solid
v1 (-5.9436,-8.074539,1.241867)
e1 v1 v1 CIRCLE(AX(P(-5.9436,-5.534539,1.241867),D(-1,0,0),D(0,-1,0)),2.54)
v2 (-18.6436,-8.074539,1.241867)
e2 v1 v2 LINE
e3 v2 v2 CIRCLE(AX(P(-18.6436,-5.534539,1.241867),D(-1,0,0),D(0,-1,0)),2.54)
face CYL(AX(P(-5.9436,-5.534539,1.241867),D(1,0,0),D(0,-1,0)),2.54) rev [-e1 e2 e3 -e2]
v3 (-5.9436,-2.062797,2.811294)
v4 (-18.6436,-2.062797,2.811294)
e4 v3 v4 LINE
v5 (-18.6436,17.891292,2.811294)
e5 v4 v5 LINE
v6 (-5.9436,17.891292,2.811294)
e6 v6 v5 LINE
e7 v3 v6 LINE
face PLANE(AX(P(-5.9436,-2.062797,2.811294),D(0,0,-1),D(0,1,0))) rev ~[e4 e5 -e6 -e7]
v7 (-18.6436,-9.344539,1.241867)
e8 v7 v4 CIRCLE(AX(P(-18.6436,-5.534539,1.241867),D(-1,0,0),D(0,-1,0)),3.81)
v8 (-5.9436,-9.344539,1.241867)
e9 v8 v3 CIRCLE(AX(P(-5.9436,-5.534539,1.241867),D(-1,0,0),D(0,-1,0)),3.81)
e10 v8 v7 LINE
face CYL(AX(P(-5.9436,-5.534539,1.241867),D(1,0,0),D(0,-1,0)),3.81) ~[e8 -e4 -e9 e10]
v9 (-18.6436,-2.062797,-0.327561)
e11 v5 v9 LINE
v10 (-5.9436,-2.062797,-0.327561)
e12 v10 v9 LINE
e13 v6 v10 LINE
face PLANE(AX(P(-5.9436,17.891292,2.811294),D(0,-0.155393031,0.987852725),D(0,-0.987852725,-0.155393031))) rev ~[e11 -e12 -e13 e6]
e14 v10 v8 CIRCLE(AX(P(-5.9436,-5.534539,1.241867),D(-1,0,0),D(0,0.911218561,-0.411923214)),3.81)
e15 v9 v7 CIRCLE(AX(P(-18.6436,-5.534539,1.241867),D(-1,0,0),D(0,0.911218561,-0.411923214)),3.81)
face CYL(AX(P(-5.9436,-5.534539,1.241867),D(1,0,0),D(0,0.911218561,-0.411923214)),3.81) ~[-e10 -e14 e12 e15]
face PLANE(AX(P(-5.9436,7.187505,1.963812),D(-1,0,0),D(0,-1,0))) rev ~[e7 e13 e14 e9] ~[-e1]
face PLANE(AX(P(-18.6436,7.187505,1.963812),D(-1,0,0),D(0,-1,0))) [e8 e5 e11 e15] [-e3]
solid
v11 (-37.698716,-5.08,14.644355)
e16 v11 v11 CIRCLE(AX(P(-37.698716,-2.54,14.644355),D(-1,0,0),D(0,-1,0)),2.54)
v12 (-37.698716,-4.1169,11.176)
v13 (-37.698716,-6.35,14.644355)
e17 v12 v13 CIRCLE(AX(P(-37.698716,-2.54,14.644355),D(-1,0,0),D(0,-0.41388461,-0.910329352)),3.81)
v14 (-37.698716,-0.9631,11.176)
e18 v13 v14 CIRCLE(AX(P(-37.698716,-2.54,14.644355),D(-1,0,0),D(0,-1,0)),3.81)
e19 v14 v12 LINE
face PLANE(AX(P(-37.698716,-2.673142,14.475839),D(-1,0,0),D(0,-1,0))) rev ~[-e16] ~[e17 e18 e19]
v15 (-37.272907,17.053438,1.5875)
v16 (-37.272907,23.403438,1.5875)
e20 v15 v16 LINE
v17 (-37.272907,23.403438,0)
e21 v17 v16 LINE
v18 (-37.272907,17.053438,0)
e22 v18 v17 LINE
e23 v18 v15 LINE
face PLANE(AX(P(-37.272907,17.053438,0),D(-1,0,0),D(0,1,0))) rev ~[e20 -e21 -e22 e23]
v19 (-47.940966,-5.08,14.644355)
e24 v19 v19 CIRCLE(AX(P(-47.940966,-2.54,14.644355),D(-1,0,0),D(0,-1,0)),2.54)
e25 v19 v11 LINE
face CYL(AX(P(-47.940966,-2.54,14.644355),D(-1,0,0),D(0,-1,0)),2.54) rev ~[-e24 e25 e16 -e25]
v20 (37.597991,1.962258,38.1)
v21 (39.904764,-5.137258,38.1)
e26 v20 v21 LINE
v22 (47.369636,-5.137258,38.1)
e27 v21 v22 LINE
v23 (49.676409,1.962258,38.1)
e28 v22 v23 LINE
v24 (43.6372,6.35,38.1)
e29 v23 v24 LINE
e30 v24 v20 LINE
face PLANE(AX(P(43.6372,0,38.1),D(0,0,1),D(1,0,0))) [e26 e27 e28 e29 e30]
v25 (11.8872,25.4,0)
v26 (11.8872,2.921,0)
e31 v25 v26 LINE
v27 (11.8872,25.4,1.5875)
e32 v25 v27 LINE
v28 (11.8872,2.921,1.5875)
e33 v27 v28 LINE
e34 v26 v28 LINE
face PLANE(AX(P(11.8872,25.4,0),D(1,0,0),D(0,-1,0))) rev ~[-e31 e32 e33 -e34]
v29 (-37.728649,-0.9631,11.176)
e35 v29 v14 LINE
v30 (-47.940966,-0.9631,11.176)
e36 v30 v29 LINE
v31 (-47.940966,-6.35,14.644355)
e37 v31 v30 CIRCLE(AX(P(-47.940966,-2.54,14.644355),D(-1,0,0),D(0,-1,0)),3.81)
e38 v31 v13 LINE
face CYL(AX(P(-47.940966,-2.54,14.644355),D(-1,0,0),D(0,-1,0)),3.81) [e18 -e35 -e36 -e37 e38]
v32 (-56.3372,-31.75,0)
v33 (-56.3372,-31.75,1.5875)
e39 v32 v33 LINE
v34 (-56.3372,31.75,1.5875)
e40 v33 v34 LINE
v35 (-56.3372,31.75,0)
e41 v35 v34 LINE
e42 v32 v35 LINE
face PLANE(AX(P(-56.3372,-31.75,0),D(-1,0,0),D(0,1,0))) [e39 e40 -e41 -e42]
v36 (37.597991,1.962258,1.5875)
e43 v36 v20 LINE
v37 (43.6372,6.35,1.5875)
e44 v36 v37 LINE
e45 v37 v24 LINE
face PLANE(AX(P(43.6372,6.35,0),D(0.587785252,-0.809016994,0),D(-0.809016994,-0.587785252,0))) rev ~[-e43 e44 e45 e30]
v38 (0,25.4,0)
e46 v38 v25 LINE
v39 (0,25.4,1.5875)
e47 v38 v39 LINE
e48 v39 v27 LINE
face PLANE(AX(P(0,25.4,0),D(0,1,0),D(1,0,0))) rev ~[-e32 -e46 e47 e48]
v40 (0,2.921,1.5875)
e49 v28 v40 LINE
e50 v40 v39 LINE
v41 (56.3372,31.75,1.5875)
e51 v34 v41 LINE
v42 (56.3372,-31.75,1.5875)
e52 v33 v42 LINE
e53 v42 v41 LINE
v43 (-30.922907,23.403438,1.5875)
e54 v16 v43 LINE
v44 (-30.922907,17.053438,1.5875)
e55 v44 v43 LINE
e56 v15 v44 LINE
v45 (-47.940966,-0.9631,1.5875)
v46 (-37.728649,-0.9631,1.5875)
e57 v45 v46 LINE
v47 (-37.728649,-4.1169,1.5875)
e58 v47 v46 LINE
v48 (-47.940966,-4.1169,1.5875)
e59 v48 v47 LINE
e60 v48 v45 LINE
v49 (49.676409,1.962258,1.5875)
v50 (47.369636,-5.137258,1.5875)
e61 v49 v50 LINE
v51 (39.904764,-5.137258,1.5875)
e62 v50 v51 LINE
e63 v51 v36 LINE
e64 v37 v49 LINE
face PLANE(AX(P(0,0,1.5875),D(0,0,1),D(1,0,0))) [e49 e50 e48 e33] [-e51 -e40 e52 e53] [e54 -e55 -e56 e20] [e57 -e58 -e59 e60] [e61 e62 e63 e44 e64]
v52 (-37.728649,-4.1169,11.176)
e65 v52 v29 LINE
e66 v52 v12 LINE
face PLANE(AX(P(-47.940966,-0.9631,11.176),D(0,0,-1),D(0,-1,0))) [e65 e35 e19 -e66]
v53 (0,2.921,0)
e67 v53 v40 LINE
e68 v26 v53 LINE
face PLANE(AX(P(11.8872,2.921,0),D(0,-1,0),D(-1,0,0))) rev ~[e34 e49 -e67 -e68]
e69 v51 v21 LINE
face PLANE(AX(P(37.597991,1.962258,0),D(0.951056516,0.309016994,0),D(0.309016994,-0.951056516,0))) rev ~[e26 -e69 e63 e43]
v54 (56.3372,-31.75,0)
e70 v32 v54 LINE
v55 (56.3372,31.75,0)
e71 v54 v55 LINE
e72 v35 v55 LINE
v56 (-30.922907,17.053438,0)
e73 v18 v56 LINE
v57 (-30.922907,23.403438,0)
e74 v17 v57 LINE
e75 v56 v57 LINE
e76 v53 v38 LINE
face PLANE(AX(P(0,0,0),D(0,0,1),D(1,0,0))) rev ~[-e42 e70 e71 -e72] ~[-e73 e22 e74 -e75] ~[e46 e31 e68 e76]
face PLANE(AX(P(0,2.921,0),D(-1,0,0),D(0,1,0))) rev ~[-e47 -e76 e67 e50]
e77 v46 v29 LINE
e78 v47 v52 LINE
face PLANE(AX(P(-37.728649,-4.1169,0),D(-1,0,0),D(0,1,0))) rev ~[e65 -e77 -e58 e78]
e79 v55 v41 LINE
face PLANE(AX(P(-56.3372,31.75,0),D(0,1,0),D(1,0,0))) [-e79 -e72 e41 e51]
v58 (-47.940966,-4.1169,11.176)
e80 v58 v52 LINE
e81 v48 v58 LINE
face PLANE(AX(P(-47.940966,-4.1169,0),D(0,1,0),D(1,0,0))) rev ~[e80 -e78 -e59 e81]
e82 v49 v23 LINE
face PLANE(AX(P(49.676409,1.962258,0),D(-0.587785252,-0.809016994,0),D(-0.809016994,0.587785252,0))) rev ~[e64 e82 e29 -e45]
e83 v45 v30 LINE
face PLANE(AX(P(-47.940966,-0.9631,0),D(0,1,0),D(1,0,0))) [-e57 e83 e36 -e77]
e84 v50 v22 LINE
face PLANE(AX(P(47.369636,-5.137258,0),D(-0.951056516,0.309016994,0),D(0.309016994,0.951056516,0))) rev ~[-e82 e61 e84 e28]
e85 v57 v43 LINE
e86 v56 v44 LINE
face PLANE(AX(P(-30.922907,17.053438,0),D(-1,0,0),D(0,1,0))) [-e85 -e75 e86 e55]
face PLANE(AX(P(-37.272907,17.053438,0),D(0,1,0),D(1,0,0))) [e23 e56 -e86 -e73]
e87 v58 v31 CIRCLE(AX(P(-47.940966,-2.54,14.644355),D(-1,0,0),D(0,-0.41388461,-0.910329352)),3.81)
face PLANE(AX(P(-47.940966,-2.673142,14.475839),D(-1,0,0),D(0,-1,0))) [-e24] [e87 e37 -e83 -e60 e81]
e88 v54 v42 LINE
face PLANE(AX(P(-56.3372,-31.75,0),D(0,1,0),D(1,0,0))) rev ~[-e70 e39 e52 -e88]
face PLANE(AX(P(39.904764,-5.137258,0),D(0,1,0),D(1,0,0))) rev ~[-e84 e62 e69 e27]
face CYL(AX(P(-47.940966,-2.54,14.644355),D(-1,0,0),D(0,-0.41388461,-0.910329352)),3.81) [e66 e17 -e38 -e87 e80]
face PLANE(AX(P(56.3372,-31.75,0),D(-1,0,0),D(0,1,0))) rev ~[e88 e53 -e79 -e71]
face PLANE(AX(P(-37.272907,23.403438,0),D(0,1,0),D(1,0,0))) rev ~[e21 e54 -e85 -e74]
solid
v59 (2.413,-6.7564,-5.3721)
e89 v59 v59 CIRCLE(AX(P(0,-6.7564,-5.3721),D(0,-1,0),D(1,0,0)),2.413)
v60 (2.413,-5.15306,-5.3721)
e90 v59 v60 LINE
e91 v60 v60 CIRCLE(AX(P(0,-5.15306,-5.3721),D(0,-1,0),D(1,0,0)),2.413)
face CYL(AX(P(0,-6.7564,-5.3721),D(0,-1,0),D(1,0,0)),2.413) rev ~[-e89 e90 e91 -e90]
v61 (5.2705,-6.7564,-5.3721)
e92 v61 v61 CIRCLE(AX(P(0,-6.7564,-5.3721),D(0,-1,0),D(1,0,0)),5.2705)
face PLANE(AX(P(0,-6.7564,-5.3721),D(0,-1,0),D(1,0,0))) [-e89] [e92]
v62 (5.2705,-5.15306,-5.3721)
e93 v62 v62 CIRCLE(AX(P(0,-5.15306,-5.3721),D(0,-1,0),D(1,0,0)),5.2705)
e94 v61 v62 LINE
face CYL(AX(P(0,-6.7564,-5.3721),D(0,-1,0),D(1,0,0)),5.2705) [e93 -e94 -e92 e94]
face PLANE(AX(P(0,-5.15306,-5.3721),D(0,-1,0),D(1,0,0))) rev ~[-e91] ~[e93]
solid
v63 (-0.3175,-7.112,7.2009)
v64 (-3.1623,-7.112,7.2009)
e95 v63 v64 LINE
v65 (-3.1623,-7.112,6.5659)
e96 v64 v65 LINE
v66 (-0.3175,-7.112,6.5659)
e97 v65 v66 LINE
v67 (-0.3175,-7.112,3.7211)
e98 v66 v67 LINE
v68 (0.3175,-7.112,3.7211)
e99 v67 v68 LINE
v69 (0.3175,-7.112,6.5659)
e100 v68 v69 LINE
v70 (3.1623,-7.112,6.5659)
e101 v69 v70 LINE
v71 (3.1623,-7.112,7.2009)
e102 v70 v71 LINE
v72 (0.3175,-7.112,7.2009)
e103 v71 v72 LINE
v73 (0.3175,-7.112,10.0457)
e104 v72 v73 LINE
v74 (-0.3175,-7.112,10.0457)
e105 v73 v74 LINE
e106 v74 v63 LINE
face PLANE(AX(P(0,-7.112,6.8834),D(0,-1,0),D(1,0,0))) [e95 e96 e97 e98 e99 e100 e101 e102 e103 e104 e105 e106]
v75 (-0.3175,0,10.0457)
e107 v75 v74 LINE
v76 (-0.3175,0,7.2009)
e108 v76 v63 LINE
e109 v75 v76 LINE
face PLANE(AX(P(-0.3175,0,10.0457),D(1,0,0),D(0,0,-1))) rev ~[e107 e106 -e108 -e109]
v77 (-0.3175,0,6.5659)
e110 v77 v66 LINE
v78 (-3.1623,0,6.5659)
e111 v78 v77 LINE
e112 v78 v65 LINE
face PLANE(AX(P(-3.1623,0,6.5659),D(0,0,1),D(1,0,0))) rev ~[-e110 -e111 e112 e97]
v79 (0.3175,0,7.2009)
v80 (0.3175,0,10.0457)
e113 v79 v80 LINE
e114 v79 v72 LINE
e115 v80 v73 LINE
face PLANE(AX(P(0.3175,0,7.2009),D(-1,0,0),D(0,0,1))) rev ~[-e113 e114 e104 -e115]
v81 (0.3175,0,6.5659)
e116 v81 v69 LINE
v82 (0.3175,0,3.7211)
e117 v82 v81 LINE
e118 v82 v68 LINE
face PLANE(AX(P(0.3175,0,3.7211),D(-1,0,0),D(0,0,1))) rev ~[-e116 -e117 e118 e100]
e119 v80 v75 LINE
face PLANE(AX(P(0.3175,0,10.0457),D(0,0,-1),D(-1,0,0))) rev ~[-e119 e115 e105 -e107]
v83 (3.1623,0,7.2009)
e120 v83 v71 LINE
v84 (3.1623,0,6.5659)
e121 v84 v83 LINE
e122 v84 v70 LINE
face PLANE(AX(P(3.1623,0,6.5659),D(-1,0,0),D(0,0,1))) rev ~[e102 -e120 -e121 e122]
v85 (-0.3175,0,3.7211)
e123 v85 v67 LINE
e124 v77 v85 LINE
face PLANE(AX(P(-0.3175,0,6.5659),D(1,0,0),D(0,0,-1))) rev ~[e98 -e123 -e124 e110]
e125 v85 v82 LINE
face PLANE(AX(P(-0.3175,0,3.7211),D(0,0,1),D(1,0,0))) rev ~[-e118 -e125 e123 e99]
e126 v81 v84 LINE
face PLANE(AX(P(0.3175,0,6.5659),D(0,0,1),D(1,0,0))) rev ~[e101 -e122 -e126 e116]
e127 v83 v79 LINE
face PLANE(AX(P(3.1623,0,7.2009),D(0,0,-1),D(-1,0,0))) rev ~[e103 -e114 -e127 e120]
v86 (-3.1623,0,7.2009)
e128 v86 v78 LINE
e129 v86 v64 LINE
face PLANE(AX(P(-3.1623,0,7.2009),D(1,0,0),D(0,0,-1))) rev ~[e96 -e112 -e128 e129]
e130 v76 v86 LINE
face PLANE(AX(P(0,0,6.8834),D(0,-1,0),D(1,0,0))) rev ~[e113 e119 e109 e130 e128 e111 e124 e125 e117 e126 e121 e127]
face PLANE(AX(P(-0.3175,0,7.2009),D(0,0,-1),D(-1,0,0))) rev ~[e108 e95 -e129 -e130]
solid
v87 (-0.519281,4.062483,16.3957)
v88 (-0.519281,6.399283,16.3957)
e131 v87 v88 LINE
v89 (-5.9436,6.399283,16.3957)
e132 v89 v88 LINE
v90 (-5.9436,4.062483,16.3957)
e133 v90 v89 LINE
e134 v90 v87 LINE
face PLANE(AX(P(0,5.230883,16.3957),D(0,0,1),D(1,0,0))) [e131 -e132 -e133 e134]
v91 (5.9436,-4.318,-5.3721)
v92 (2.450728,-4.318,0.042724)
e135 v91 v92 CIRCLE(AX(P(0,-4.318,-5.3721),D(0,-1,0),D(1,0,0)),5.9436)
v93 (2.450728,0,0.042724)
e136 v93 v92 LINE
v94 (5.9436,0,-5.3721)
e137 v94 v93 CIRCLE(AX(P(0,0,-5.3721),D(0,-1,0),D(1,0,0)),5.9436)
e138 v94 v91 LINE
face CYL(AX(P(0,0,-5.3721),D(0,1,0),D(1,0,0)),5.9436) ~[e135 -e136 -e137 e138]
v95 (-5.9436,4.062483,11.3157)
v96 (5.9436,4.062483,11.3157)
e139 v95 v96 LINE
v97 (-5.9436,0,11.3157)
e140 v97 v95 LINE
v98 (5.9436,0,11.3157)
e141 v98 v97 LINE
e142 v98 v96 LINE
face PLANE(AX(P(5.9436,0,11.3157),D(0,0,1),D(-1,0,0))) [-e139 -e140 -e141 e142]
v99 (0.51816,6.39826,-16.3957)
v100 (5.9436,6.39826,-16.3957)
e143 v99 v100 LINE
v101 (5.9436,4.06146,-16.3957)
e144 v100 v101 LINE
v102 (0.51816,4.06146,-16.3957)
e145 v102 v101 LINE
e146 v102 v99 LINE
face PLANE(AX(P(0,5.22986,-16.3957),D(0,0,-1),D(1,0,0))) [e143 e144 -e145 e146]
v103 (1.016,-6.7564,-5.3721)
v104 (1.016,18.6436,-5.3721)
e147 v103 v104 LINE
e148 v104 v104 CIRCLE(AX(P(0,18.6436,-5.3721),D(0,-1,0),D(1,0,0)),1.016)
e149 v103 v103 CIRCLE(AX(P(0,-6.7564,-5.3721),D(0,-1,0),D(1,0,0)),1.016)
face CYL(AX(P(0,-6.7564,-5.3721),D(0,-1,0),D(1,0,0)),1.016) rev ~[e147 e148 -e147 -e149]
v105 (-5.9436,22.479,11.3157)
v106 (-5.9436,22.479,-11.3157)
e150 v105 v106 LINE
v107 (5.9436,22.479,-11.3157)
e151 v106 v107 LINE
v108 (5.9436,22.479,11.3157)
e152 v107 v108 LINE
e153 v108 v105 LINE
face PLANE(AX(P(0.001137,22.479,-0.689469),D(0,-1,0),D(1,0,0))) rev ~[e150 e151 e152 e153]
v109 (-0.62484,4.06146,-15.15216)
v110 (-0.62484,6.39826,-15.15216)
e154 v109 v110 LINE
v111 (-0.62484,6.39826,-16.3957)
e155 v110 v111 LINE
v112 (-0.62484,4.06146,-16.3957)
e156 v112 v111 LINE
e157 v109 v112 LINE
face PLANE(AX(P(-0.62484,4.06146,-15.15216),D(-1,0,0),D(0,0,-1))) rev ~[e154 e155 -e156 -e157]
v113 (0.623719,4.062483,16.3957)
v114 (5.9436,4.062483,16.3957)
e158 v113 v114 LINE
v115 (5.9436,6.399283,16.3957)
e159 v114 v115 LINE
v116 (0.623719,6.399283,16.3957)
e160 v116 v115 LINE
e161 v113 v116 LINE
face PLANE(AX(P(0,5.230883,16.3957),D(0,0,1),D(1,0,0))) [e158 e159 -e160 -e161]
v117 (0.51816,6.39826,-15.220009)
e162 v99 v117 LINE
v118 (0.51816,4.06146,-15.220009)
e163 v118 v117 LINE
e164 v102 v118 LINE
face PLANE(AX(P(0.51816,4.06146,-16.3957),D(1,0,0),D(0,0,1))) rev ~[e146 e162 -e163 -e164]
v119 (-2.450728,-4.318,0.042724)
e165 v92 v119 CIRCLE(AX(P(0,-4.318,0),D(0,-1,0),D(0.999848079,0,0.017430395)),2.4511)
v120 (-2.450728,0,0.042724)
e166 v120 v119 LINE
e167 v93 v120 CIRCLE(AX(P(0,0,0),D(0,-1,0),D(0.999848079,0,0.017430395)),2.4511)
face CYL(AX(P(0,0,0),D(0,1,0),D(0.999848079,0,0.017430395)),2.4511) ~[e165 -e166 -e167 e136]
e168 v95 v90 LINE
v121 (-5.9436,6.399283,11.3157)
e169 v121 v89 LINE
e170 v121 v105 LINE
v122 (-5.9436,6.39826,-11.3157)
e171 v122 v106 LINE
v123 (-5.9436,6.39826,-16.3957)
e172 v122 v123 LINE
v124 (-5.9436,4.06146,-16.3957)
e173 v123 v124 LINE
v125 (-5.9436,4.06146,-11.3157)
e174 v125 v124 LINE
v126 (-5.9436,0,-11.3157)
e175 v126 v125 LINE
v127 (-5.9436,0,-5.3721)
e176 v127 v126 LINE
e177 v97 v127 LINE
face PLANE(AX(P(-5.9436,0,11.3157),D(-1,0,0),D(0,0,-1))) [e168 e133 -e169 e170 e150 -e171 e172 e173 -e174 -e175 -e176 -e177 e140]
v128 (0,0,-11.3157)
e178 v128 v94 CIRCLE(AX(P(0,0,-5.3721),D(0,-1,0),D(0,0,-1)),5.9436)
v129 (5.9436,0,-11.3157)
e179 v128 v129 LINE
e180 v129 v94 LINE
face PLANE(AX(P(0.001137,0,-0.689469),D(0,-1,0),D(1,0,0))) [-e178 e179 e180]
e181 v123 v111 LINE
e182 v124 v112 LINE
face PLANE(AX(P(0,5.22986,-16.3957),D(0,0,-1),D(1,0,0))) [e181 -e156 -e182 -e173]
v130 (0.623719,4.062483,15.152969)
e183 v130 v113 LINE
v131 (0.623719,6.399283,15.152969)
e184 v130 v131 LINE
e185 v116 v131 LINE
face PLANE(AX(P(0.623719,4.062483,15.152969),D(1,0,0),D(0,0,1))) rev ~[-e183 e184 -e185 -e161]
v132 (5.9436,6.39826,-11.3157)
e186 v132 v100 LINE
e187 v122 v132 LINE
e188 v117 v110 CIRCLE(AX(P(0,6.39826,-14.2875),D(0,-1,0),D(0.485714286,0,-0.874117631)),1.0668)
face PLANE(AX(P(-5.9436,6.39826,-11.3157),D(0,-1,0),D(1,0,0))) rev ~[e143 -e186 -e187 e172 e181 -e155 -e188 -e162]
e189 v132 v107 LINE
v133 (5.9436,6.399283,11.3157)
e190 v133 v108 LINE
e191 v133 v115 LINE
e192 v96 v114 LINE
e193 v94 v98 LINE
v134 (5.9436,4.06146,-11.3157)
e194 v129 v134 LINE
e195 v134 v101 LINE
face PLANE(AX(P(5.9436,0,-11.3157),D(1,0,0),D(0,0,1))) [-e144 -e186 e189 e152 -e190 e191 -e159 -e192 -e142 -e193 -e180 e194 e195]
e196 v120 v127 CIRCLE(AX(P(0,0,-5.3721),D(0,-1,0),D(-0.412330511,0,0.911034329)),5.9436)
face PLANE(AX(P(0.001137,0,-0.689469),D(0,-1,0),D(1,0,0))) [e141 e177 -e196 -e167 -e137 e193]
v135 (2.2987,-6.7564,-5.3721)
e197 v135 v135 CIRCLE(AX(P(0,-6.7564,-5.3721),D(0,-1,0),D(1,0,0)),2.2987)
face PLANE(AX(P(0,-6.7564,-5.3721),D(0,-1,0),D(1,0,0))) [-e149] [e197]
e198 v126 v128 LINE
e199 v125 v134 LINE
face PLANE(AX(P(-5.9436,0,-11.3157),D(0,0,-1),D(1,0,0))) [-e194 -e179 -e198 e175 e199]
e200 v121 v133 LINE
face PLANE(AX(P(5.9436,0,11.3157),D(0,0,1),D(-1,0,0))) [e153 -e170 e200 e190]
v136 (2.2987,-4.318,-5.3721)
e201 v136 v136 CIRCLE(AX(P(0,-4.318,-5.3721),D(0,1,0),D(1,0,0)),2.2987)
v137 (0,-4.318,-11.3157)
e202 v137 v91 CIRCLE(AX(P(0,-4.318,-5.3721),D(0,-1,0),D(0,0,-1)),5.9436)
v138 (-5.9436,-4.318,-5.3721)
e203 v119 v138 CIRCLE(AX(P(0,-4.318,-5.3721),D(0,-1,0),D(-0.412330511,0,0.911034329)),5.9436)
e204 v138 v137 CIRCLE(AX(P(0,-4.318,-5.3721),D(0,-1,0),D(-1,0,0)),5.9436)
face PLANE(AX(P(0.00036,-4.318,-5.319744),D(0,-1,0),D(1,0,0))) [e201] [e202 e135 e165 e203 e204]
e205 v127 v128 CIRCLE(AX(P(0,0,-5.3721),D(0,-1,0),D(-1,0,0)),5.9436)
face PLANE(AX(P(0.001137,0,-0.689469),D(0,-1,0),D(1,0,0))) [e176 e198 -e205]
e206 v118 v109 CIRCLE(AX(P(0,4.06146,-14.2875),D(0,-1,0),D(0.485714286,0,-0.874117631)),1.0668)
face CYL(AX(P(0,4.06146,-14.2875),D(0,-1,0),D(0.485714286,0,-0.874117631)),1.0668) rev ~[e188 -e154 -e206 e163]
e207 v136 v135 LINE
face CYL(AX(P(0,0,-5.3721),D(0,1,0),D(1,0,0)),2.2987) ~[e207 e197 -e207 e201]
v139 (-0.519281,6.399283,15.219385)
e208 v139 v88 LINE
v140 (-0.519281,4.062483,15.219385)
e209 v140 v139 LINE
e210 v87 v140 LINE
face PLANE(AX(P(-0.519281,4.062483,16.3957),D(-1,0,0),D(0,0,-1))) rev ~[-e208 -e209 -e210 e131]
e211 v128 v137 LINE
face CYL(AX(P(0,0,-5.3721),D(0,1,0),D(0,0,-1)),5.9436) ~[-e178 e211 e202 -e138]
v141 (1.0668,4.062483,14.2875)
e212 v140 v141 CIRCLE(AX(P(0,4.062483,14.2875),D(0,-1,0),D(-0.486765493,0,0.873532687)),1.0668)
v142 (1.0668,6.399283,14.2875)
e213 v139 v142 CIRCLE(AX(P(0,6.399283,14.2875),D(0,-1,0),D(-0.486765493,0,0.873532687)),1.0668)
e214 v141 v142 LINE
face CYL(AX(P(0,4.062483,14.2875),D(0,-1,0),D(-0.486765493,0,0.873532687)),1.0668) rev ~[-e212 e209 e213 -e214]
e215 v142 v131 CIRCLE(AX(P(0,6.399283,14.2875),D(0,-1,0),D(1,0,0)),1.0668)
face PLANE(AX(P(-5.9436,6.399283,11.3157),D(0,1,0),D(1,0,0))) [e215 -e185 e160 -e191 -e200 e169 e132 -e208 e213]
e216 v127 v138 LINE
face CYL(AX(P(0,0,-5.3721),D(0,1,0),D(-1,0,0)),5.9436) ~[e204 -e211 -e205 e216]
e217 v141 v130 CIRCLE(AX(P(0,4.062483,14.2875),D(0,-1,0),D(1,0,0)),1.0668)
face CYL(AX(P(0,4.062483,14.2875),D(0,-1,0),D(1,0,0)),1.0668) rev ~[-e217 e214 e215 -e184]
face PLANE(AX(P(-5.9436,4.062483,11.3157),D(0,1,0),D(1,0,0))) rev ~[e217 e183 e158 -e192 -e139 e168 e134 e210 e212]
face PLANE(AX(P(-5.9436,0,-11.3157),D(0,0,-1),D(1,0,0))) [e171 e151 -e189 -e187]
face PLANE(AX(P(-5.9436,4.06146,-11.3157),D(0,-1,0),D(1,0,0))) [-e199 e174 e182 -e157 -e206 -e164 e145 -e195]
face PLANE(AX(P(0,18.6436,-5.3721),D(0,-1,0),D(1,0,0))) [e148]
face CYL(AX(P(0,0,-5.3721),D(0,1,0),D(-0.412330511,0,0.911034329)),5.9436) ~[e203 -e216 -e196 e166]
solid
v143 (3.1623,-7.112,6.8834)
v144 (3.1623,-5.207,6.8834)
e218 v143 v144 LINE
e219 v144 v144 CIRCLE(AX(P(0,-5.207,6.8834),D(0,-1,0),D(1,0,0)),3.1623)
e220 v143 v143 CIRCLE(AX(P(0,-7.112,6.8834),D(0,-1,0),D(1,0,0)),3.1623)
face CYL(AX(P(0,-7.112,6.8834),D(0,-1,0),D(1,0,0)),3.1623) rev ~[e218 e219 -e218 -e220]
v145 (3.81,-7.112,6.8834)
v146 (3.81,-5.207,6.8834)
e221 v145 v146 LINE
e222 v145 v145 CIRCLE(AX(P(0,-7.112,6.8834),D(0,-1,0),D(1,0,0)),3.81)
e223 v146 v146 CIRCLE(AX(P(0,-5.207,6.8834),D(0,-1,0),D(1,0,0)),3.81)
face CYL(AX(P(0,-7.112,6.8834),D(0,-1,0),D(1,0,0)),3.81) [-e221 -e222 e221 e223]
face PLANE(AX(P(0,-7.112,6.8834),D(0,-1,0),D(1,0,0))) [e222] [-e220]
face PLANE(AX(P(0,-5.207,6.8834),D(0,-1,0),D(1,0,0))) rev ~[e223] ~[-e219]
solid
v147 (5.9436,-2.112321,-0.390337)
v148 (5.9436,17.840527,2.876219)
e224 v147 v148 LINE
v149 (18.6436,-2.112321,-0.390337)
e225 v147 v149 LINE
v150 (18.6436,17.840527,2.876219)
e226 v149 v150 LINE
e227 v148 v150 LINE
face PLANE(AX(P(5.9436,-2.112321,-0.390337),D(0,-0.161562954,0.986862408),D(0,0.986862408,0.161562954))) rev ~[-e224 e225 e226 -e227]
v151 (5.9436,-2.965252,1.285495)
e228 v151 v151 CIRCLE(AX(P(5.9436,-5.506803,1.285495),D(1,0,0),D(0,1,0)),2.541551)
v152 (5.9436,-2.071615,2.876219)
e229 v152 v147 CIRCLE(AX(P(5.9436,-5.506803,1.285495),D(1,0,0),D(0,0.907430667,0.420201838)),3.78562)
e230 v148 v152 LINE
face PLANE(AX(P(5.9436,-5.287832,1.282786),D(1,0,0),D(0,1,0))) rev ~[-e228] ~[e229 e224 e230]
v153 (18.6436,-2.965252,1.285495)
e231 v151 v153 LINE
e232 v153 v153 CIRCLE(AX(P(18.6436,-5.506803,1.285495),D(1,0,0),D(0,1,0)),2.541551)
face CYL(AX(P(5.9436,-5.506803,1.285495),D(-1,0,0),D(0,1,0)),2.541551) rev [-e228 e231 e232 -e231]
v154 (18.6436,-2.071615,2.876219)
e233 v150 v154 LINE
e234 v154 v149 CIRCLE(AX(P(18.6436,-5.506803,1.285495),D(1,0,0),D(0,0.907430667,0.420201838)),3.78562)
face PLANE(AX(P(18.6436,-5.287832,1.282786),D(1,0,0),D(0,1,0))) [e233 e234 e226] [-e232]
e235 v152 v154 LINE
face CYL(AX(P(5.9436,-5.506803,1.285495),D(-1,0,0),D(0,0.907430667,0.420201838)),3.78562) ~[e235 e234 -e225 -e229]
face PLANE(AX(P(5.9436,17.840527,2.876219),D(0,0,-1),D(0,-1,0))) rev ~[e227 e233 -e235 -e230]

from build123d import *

# Parameters (mm, degrees)
F0_W      = 112.6744
F0_H      = 63.5
F0_W_2    = 10.2123171091
F0_H_2    = 3.1538007315
F0_W_3    = 6.35
F0_H_3    = 6.35
F1_DEPTH  = 1.5875
F2_DEPTH  = 38.1
F3_R      = 2.2987
F4_DEPTH  = 4.318
F5_DEPTH  = 6.7564
F6_DEPTH  = 22.479
F7_W      = 11.8872
F7_H      = 2.3368
F8_DEPTH  = 5.08
F10_DEPTH = 2.48331
F11_W     = 11.8872
F11_H     = 2.3368
F12_DEPTH = 5.08
F14_DEPTH = 25.4
F15_R     = 1.016
F16_DEPTH = 25.4
F18_DEPTH = 7.112
F19_R     = 3.81
F19_R_2   = 3.1623
F20_DEPTH = 1.905
F21_R     = 5.2705
F21_R_2   = 2.413
F22_DEPTH = 1.60334
F23_R     = 2.54
F24_DEPTH = 12.7
F25_R     = 2.5415511009
F26_DEPTH = 12.7
F27_DEPTH = 11.176
F28_R     = 2.54
F29_DEPTH = 10.24225


with BuildPart() as f1:
    # F0 (on Top) → F1 (new body)
    with BuildSketch(Plane.XY):
        Rectangle(F0_W, F0_H)
        with Locations((-42.8348071873, -2.54)):
            Rectangle(F0_W_2, F0_H_2, mode=Mode.SUBTRACT)
        with Locations((-34.0979072105, 20.228437902)):
            Rectangle(F0_W_3, F0_H_3, mode=Mode.SUBTRACT)
        Polygon((0, 2.921), (0, 25.4), (5.9436, 25.4), (11.8872, 25.4), (11.8872, 2.921), (5.9436, 2.921), align=None, mode=Mode.SUBTRACT)
        Polygon((49.6764088785, 1.9622579143), (47.3696363521, -5.1372579143), (39.9047636479, -5.1372579143), (37.5979911215, 1.9622579143), (43.6372, 6.35), align=None, mode=Mode.SUBTRACT)
    extrude(amount=F1_DEPTH)

    # F0 (on Top) → F2 (join)
    with BuildSketch(Plane.XY):
        Polygon((39.9047636479, -5.1372579143), (47.3696363521, -5.1372579143), (49.6764088785, 1.9622579143), (43.6372, 6.35), (37.5979911215, 1.9622579143), align=None)
    extrude(amount=F2_DEPTH)

    # F0 (on Top) → F27 (join)
    with BuildSketch(Plane.XY):
        with Locations((-42.8348071873, -2.54)):
            Rectangle(F0_W_2, F0_H_2)
    extrude(amount=F27_DEPTH)

    # F28 (on face) → F29 (join)
    with BuildSketch(Plane(origin=(-47.9409657419, 0, 0), x_dir=(0, -1, 0), z_dir=(-1, 0, 0))):
        with BuildLine():
            ThreePointArc((4.1169003658, 11.176), (5.7434427101, 12.5818188188), (6.35, 14.6443548314))
            ThreePointArc((6.35, 14.6443548314), (0.4774639874, 17.8477975415), (0.9630996342, 11.176))
            Line((0.9630996342, 11.176), (4.1169003658, 11.176))
        make_face()
        with Locations((2.54, 14.6443548314)):
            Circle(F28_R, mode=Mode.SUBTRACT)
    extrude(amount=-F29_DEPTH)


with BuildPart() as f4:
    # F3 (on Front) → F4 (new body)
    with BuildSketch(Plane.XZ):
        with BuildLine():
            ThreePointArc((0, -11.3157), (4.2027598647, -9.5748598647), (5.9436, -5.3721))
            ThreePointArc((5.9436, -5.3721), (4.9946233933, -2.1502809302), (2.4507276268, 0.0427236407))
            ThreePointArc((2.4507276268, 0.0427236407), (2.4510069049, 0.0213626317), (2.4511, 0))
            ThreePointArc((2.4511, 0), (-0.0213626317, -2.4510069049), (-2.4507276268, 0.0427236407))
            ThreePointArc((-2.4507276268, 0.0427236407), (-4.9946233933, -2.1502809302), (-5.9436, -5.3721))
            ThreePointArc((-5.9436, -5.3721), (-4.2027598647, -9.5748598647), (0, -11.3157))
        make_face()
        with Locations((0, -5.3721)):
            Circle(F3_R, mode=Mode.SUBTRACT)
        with Locations((0, -5.3721)):
            Circle(F3_R)
        with BuildLine():
            ThreePointArc((2.4511, 0), (2.4510069049, 0.0213626317), (2.4507276268, 0.0427236407))
            ThreePointArc((2.4507276268, 0.0427236407), (0, 0.5715), (-2.4507276268, 0.0427236407))
            ThreePointArc((-2.4507276268, 0.0427236407), (-0.0213626317, -2.4510069049), (2.4511, 0))
        make_face()
        with BuildLine():
            ThreePointArc((-2.4507276268, 0.0427236407), (0, 0.5715), (2.4507276268, 0.0427236407))
            ThreePointArc((2.4507276268, 0.0427236407), (0, 2.4511), (-2.4507276268, 0.0427236407))
        make_face()
    extrude(amount=F4_DEPTH)

    # F3 (on Front) → F5 (join)
    with BuildSketch(Plane.XZ):
        with Locations((0, -5.3721)):
            Circle(F3_R)
    extrude(amount=F5_DEPTH)

    # F3 (on Front) → F6 (join)
    with BuildSketch(Plane.XZ):
        with BuildLine():
            ThreePointArc((2.4511, 0), (2.4510069049, 0.0213626317), (2.4507276268, 0.0427236407))
            ThreePointArc((2.4507276268, 0.0427236407), (0, 0.5715), (-2.4507276268, 0.0427236407))
            ThreePointArc((-2.4507276268, 0.0427236407), (-0.0213626317, -2.4510069049), (2.4511, 0))
        make_face()
        with BuildLine():
            ThreePointArc((0, -11.3157), (4.2027598647, -9.5748598647), (5.9436, -5.3721))
            ThreePointArc((5.9436, -5.3721), (4.9946233933, -2.1502809302), (2.4507276268, 0.0427236407))
            ThreePointArc((2.4507276268, 0.0427236407), (2.4510069049, 0.0213626317), (2.4511, 0))
            ThreePointArc((2.4511, 0), (-0.0213626317, -2.4510069049), (-2.4507276268, 0.0427236407))
            ThreePointArc((-2.4507276268, 0.0427236407), (-4.9946233933, -2.1502809302), (-5.9436, -5.3721))
            ThreePointArc((-5.9436, -5.3721), (-4.2027598647, -9.5748598647), (0, -11.3157))
        make_face()
        with Locations((0, -5.3721)):
            Circle(F3_R, mode=Mode.SUBTRACT)
        with Locations((0, -5.3721)):
            Circle(F3_R)
        with BuildLine():
            Line((5.9436, -11.3157), (5.9436, -5.3721))
            ThreePointArc((5.9436, -5.3721), (4.2027598647, -9.5748598647), (0, -11.3157))
            Line((0, -11.3157), (5.9436, -11.3157))
        make_face()
        with BuildLine():
            ThreePointArc((0, -11.3157), (-4.2027598647, -9.5748598647), (-5.9436, -5.3721))
            Line((-5.9436, -5.3721), (-5.9436, -11.3157))
            Line((-5.9436, -11.3157), (0, -11.3157))
        make_face()
        with BuildLine():
            Line((5.9436, -5.3721), (5.9436, 11.3157))
            Line((5.9436, 11.3157), (-5.9436, 11.3157))
            Line((-5.9436, 11.3157), (-5.9436, -5.3721))
            ThreePointArc((-5.9436, -5.3721), (-4.9946233933, -2.1502809302), (-2.4507276268, 0.0427236407))
            ThreePointArc((-2.4507276268, 0.0427236407), (0, 2.4511), (2.4507276268, 0.0427236407))
            ThreePointArc((2.4507276268, 0.0427236407), (4.9946233933, -2.1502809302), (5.9436, -5.3721))
        make_face()
        with BuildLine():
            ThreePointArc((-2.4507276268, 0.0427236407), (0, 0.5715), (2.4507276268, 0.0427236407))
            ThreePointArc((2.4507276268, 0.0427236407), (0, 2.4511), (-2.4507276268, 0.0427236407))
        make_face()
    extrude(amount=-F6_DEPTH)

    # F7 (on face) → F8 (join)
    with BuildSketch(Plane.XY.offset(11.3157)):
        with Locations((0, 5.2308826215)):
            Rectangle(F7_W, F7_H)
    extrude(amount=F8_DEPTH)

    # F9 (on face) → F10 (cut)
    with BuildSketch(Plane.XZ.offset(-4.0624826215)):
        with BuildLine():
            ThreePointArc((-0.5192814278, 15.2193846703), (-0.5404131812, 13.3677088098), (1.0668, 14.2875))
            ThreePointArc((1.0668, 14.2875), (0.9495907573, 14.7736477487), (0.6237185722, 15.152969458))
            Line((0.6237185722, 15.152969458), (0.6237185722, 15.0088137016))
            Line((0.6237185722, 15.0088137016), (-0.5192814278, 15.0088137016))
            Line((-0.5192814278, 15.0088137016), (-0.5192814278, 15.2193846703))
        make_face()
        with BuildLine():
            Line((0.6237185722, 15.0088137016), (0.6237185722, 15.152969458))
            ThreePointArc((0.6237185722, 15.152969458), (0.061883151, 15.3525036223), (-0.5192814278, 15.2193846703))
            Line((-0.5192814278, 15.2193846703), (-0.5192814278, 15.0088137016))
            Line((-0.5192814278, 15.0088137016), (0.6237185722, 15.0088137016))
        make_face()
        with BuildLine():
            ThreePointArc((-0.5192814278, 15.2193846703), (0.061883151, 15.3525036223), (0.6237185722, 15.152969458))
            Line((0.6237185722, 15.152969458), (0.6237185722, 16.3957))
            Line((0.6237185722, 16.3957), (-0.5192814278, 16.3957))
            Line((-0.5192814278, 16.3957), (-0.5192814278, 15.2193846703))
        make_face()
    extrude(amount=-F10_DEPTH, mode=Mode.SUBTRACT)

    # F11 (on face) → F12 (join)
    with BuildSketch(Plane(origin=(0, 0, -11.3157), x_dir=(1, 0, 0), z_dir=(0, 0, -1))):
        with Locations((0, -5.22986)):
            Rectangle(F11_W, F11_H)
    extrude(amount=F12_DEPTH)

    # F13 (on face) → F14 (cut)
    with BuildSketch(Plane.XZ.offset(-4.06146)):
        with BuildLine():
            Line((-0.62484, -16.3957), (0.51816, -16.3957))
            Line((0.51816, -16.3957), (0.51816, -15.2200086886))
            ThreePointArc((0.51816, -15.2200086886), (0.0632140085, -13.2225745429), (-0.62484, -15.1521601728))
            Line((-0.62484, -15.1521601728), (-0.62484, -16.3957))
        make_face()
    extrude(amount=-F14_DEPTH, mode=Mode.SUBTRACT)

    # F15 (on face) → F16 (cut)
    with BuildSketch(Plane.XZ.offset(6.7564)):
        with Locations((0, -5.3721)):
            Circle(F15_R)
    extrude(amount=-F16_DEPTH, mode=Mode.SUBTRACT)


with BuildPart() as f18:
    # F17 (on face) → F18 (new body)
    with BuildSketch(Plane.XZ):
        Polygon((0.3175, 10.0457), (0, 10.0457), (-0.3175, 10.0457), (-0.3175, 7.2009), (-3.1623, 7.2009), (-3.1623, 6.8834), (-3.1623, 6.5659), (-0.3175, 6.5659), (-0.3175, 3.7211), (0.3175, 3.7211), (0.3175, 6.5659), (3.1623, 6.5659), (3.1623, 7.2009), (0.3175, 7.2009), align=None)
    extrude(amount=F18_DEPTH)


with BuildPart() as f20:
    # F19 (on face) → F20 (new body)
    with BuildSketch(Plane.XZ.offset(7.112)):
        with Locations((0, 6.8834)):
            Circle(F19_R)
        with Locations((0, 6.8834)):
            Circle(F19_R_2, mode=Mode.SUBTRACT)
    extrude(amount=-F20_DEPTH)


with BuildPart() as f22:
    # F21 (on face) → F22 (new body)
    with BuildSketch(Plane.XZ.offset(6.7564)):
        with Locations((0, -5.3721)):
            Circle(F21_R)
        with Locations((0, -5.3721)):
            Circle(F21_R_2, mode=Mode.SUBTRACT)
    extrude(amount=-F22_DEPTH)


with BuildPart() as f24:
    # F23 (on face) → F24 (new body)
    with BuildSketch(Plane(origin=(-5.9436, 0, 0), x_dir=(0, -1, 0), z_dir=(-1, 0, 0))):
        with BuildLine():
            Line((2.0627967482, 2.8112942947), (-17.8912921724, 2.8112942947))
            Line((-17.8912921724, 2.8112942947), (2.0627967482, -0.3275605978))
            ThreePointArc((2.0627967482, -0.3275605978), (1.7245394649, 1.2418668484), (2.0627967482, 2.8112942947))
        make_face()
        with BuildLine():
            ThreePointArc((9.3445394649, 1.2418668484), (6.3372723748, 4.9663426337), (2.0627967482, 2.8112942947))
            ThreePointArc((2.0627967482, 2.8112942947), (1.7245394649, 1.2418668484), (2.0627967482, -0.3275605978))
            ThreePointArc((2.0627967482, -0.3275605978), (6.3372723748, -2.4826089369), (9.3445394649, 1.2418668484))
        make_face()
        with Locations((5.5345394649, 1.2418668484)):
            Circle(F23_R, mode=Mode.SUBTRACT)
    extrude(amount=F24_DEPTH)


with BuildPart() as f26:
    # F25 (on face) → F26 (new body)
    with BuildSketch(Plane.YZ.offset(5.9436)):
        with BuildLine():
            ThreePointArc((-2.1123207355, -0.3903365839), (-1.8202639704, 0.4250587769), (-1.7211828816, 1.2854945307))
            ThreePointArc((-1.7211828816, 1.2854945307), (-1.8098288556, 2.0999280003), (-2.0716152208, 2.8762191082))
            ThreePointArc((-2.0716152208, 2.8762191082), (-9.2921294544, 1.3326645995), (-2.1123207355, -0.3903365839))
        make_face()
        with Locations((-5.5068031124, 1.2854945307)):
            Circle(F25_R, mode=Mode.SUBTRACT)
        with BuildLine():
            ThreePointArc((-2.0716152208, 2.8762191082), (-1.8098288556, 2.0999280003), (-1.7211828816, 1.2854945307))
            ThreePointArc((-1.7211828816, 1.2854945307), (-1.8202639704, 0.4250587769), (-2.1123207355, -0.3903365839))
            Line((-2.1123207355, -0.3903365839), (17.8405269985, 2.8762191082))
            Line((17.8405269985, 2.8762191082), (-2.0716152208, 2.8762191082))
        make_face()
    extrude(amount=F26_DEPTH)


solid = Compound([f1.part, f4.part, f18.part, f20.part, f22.part, f24.part, f26.part])
